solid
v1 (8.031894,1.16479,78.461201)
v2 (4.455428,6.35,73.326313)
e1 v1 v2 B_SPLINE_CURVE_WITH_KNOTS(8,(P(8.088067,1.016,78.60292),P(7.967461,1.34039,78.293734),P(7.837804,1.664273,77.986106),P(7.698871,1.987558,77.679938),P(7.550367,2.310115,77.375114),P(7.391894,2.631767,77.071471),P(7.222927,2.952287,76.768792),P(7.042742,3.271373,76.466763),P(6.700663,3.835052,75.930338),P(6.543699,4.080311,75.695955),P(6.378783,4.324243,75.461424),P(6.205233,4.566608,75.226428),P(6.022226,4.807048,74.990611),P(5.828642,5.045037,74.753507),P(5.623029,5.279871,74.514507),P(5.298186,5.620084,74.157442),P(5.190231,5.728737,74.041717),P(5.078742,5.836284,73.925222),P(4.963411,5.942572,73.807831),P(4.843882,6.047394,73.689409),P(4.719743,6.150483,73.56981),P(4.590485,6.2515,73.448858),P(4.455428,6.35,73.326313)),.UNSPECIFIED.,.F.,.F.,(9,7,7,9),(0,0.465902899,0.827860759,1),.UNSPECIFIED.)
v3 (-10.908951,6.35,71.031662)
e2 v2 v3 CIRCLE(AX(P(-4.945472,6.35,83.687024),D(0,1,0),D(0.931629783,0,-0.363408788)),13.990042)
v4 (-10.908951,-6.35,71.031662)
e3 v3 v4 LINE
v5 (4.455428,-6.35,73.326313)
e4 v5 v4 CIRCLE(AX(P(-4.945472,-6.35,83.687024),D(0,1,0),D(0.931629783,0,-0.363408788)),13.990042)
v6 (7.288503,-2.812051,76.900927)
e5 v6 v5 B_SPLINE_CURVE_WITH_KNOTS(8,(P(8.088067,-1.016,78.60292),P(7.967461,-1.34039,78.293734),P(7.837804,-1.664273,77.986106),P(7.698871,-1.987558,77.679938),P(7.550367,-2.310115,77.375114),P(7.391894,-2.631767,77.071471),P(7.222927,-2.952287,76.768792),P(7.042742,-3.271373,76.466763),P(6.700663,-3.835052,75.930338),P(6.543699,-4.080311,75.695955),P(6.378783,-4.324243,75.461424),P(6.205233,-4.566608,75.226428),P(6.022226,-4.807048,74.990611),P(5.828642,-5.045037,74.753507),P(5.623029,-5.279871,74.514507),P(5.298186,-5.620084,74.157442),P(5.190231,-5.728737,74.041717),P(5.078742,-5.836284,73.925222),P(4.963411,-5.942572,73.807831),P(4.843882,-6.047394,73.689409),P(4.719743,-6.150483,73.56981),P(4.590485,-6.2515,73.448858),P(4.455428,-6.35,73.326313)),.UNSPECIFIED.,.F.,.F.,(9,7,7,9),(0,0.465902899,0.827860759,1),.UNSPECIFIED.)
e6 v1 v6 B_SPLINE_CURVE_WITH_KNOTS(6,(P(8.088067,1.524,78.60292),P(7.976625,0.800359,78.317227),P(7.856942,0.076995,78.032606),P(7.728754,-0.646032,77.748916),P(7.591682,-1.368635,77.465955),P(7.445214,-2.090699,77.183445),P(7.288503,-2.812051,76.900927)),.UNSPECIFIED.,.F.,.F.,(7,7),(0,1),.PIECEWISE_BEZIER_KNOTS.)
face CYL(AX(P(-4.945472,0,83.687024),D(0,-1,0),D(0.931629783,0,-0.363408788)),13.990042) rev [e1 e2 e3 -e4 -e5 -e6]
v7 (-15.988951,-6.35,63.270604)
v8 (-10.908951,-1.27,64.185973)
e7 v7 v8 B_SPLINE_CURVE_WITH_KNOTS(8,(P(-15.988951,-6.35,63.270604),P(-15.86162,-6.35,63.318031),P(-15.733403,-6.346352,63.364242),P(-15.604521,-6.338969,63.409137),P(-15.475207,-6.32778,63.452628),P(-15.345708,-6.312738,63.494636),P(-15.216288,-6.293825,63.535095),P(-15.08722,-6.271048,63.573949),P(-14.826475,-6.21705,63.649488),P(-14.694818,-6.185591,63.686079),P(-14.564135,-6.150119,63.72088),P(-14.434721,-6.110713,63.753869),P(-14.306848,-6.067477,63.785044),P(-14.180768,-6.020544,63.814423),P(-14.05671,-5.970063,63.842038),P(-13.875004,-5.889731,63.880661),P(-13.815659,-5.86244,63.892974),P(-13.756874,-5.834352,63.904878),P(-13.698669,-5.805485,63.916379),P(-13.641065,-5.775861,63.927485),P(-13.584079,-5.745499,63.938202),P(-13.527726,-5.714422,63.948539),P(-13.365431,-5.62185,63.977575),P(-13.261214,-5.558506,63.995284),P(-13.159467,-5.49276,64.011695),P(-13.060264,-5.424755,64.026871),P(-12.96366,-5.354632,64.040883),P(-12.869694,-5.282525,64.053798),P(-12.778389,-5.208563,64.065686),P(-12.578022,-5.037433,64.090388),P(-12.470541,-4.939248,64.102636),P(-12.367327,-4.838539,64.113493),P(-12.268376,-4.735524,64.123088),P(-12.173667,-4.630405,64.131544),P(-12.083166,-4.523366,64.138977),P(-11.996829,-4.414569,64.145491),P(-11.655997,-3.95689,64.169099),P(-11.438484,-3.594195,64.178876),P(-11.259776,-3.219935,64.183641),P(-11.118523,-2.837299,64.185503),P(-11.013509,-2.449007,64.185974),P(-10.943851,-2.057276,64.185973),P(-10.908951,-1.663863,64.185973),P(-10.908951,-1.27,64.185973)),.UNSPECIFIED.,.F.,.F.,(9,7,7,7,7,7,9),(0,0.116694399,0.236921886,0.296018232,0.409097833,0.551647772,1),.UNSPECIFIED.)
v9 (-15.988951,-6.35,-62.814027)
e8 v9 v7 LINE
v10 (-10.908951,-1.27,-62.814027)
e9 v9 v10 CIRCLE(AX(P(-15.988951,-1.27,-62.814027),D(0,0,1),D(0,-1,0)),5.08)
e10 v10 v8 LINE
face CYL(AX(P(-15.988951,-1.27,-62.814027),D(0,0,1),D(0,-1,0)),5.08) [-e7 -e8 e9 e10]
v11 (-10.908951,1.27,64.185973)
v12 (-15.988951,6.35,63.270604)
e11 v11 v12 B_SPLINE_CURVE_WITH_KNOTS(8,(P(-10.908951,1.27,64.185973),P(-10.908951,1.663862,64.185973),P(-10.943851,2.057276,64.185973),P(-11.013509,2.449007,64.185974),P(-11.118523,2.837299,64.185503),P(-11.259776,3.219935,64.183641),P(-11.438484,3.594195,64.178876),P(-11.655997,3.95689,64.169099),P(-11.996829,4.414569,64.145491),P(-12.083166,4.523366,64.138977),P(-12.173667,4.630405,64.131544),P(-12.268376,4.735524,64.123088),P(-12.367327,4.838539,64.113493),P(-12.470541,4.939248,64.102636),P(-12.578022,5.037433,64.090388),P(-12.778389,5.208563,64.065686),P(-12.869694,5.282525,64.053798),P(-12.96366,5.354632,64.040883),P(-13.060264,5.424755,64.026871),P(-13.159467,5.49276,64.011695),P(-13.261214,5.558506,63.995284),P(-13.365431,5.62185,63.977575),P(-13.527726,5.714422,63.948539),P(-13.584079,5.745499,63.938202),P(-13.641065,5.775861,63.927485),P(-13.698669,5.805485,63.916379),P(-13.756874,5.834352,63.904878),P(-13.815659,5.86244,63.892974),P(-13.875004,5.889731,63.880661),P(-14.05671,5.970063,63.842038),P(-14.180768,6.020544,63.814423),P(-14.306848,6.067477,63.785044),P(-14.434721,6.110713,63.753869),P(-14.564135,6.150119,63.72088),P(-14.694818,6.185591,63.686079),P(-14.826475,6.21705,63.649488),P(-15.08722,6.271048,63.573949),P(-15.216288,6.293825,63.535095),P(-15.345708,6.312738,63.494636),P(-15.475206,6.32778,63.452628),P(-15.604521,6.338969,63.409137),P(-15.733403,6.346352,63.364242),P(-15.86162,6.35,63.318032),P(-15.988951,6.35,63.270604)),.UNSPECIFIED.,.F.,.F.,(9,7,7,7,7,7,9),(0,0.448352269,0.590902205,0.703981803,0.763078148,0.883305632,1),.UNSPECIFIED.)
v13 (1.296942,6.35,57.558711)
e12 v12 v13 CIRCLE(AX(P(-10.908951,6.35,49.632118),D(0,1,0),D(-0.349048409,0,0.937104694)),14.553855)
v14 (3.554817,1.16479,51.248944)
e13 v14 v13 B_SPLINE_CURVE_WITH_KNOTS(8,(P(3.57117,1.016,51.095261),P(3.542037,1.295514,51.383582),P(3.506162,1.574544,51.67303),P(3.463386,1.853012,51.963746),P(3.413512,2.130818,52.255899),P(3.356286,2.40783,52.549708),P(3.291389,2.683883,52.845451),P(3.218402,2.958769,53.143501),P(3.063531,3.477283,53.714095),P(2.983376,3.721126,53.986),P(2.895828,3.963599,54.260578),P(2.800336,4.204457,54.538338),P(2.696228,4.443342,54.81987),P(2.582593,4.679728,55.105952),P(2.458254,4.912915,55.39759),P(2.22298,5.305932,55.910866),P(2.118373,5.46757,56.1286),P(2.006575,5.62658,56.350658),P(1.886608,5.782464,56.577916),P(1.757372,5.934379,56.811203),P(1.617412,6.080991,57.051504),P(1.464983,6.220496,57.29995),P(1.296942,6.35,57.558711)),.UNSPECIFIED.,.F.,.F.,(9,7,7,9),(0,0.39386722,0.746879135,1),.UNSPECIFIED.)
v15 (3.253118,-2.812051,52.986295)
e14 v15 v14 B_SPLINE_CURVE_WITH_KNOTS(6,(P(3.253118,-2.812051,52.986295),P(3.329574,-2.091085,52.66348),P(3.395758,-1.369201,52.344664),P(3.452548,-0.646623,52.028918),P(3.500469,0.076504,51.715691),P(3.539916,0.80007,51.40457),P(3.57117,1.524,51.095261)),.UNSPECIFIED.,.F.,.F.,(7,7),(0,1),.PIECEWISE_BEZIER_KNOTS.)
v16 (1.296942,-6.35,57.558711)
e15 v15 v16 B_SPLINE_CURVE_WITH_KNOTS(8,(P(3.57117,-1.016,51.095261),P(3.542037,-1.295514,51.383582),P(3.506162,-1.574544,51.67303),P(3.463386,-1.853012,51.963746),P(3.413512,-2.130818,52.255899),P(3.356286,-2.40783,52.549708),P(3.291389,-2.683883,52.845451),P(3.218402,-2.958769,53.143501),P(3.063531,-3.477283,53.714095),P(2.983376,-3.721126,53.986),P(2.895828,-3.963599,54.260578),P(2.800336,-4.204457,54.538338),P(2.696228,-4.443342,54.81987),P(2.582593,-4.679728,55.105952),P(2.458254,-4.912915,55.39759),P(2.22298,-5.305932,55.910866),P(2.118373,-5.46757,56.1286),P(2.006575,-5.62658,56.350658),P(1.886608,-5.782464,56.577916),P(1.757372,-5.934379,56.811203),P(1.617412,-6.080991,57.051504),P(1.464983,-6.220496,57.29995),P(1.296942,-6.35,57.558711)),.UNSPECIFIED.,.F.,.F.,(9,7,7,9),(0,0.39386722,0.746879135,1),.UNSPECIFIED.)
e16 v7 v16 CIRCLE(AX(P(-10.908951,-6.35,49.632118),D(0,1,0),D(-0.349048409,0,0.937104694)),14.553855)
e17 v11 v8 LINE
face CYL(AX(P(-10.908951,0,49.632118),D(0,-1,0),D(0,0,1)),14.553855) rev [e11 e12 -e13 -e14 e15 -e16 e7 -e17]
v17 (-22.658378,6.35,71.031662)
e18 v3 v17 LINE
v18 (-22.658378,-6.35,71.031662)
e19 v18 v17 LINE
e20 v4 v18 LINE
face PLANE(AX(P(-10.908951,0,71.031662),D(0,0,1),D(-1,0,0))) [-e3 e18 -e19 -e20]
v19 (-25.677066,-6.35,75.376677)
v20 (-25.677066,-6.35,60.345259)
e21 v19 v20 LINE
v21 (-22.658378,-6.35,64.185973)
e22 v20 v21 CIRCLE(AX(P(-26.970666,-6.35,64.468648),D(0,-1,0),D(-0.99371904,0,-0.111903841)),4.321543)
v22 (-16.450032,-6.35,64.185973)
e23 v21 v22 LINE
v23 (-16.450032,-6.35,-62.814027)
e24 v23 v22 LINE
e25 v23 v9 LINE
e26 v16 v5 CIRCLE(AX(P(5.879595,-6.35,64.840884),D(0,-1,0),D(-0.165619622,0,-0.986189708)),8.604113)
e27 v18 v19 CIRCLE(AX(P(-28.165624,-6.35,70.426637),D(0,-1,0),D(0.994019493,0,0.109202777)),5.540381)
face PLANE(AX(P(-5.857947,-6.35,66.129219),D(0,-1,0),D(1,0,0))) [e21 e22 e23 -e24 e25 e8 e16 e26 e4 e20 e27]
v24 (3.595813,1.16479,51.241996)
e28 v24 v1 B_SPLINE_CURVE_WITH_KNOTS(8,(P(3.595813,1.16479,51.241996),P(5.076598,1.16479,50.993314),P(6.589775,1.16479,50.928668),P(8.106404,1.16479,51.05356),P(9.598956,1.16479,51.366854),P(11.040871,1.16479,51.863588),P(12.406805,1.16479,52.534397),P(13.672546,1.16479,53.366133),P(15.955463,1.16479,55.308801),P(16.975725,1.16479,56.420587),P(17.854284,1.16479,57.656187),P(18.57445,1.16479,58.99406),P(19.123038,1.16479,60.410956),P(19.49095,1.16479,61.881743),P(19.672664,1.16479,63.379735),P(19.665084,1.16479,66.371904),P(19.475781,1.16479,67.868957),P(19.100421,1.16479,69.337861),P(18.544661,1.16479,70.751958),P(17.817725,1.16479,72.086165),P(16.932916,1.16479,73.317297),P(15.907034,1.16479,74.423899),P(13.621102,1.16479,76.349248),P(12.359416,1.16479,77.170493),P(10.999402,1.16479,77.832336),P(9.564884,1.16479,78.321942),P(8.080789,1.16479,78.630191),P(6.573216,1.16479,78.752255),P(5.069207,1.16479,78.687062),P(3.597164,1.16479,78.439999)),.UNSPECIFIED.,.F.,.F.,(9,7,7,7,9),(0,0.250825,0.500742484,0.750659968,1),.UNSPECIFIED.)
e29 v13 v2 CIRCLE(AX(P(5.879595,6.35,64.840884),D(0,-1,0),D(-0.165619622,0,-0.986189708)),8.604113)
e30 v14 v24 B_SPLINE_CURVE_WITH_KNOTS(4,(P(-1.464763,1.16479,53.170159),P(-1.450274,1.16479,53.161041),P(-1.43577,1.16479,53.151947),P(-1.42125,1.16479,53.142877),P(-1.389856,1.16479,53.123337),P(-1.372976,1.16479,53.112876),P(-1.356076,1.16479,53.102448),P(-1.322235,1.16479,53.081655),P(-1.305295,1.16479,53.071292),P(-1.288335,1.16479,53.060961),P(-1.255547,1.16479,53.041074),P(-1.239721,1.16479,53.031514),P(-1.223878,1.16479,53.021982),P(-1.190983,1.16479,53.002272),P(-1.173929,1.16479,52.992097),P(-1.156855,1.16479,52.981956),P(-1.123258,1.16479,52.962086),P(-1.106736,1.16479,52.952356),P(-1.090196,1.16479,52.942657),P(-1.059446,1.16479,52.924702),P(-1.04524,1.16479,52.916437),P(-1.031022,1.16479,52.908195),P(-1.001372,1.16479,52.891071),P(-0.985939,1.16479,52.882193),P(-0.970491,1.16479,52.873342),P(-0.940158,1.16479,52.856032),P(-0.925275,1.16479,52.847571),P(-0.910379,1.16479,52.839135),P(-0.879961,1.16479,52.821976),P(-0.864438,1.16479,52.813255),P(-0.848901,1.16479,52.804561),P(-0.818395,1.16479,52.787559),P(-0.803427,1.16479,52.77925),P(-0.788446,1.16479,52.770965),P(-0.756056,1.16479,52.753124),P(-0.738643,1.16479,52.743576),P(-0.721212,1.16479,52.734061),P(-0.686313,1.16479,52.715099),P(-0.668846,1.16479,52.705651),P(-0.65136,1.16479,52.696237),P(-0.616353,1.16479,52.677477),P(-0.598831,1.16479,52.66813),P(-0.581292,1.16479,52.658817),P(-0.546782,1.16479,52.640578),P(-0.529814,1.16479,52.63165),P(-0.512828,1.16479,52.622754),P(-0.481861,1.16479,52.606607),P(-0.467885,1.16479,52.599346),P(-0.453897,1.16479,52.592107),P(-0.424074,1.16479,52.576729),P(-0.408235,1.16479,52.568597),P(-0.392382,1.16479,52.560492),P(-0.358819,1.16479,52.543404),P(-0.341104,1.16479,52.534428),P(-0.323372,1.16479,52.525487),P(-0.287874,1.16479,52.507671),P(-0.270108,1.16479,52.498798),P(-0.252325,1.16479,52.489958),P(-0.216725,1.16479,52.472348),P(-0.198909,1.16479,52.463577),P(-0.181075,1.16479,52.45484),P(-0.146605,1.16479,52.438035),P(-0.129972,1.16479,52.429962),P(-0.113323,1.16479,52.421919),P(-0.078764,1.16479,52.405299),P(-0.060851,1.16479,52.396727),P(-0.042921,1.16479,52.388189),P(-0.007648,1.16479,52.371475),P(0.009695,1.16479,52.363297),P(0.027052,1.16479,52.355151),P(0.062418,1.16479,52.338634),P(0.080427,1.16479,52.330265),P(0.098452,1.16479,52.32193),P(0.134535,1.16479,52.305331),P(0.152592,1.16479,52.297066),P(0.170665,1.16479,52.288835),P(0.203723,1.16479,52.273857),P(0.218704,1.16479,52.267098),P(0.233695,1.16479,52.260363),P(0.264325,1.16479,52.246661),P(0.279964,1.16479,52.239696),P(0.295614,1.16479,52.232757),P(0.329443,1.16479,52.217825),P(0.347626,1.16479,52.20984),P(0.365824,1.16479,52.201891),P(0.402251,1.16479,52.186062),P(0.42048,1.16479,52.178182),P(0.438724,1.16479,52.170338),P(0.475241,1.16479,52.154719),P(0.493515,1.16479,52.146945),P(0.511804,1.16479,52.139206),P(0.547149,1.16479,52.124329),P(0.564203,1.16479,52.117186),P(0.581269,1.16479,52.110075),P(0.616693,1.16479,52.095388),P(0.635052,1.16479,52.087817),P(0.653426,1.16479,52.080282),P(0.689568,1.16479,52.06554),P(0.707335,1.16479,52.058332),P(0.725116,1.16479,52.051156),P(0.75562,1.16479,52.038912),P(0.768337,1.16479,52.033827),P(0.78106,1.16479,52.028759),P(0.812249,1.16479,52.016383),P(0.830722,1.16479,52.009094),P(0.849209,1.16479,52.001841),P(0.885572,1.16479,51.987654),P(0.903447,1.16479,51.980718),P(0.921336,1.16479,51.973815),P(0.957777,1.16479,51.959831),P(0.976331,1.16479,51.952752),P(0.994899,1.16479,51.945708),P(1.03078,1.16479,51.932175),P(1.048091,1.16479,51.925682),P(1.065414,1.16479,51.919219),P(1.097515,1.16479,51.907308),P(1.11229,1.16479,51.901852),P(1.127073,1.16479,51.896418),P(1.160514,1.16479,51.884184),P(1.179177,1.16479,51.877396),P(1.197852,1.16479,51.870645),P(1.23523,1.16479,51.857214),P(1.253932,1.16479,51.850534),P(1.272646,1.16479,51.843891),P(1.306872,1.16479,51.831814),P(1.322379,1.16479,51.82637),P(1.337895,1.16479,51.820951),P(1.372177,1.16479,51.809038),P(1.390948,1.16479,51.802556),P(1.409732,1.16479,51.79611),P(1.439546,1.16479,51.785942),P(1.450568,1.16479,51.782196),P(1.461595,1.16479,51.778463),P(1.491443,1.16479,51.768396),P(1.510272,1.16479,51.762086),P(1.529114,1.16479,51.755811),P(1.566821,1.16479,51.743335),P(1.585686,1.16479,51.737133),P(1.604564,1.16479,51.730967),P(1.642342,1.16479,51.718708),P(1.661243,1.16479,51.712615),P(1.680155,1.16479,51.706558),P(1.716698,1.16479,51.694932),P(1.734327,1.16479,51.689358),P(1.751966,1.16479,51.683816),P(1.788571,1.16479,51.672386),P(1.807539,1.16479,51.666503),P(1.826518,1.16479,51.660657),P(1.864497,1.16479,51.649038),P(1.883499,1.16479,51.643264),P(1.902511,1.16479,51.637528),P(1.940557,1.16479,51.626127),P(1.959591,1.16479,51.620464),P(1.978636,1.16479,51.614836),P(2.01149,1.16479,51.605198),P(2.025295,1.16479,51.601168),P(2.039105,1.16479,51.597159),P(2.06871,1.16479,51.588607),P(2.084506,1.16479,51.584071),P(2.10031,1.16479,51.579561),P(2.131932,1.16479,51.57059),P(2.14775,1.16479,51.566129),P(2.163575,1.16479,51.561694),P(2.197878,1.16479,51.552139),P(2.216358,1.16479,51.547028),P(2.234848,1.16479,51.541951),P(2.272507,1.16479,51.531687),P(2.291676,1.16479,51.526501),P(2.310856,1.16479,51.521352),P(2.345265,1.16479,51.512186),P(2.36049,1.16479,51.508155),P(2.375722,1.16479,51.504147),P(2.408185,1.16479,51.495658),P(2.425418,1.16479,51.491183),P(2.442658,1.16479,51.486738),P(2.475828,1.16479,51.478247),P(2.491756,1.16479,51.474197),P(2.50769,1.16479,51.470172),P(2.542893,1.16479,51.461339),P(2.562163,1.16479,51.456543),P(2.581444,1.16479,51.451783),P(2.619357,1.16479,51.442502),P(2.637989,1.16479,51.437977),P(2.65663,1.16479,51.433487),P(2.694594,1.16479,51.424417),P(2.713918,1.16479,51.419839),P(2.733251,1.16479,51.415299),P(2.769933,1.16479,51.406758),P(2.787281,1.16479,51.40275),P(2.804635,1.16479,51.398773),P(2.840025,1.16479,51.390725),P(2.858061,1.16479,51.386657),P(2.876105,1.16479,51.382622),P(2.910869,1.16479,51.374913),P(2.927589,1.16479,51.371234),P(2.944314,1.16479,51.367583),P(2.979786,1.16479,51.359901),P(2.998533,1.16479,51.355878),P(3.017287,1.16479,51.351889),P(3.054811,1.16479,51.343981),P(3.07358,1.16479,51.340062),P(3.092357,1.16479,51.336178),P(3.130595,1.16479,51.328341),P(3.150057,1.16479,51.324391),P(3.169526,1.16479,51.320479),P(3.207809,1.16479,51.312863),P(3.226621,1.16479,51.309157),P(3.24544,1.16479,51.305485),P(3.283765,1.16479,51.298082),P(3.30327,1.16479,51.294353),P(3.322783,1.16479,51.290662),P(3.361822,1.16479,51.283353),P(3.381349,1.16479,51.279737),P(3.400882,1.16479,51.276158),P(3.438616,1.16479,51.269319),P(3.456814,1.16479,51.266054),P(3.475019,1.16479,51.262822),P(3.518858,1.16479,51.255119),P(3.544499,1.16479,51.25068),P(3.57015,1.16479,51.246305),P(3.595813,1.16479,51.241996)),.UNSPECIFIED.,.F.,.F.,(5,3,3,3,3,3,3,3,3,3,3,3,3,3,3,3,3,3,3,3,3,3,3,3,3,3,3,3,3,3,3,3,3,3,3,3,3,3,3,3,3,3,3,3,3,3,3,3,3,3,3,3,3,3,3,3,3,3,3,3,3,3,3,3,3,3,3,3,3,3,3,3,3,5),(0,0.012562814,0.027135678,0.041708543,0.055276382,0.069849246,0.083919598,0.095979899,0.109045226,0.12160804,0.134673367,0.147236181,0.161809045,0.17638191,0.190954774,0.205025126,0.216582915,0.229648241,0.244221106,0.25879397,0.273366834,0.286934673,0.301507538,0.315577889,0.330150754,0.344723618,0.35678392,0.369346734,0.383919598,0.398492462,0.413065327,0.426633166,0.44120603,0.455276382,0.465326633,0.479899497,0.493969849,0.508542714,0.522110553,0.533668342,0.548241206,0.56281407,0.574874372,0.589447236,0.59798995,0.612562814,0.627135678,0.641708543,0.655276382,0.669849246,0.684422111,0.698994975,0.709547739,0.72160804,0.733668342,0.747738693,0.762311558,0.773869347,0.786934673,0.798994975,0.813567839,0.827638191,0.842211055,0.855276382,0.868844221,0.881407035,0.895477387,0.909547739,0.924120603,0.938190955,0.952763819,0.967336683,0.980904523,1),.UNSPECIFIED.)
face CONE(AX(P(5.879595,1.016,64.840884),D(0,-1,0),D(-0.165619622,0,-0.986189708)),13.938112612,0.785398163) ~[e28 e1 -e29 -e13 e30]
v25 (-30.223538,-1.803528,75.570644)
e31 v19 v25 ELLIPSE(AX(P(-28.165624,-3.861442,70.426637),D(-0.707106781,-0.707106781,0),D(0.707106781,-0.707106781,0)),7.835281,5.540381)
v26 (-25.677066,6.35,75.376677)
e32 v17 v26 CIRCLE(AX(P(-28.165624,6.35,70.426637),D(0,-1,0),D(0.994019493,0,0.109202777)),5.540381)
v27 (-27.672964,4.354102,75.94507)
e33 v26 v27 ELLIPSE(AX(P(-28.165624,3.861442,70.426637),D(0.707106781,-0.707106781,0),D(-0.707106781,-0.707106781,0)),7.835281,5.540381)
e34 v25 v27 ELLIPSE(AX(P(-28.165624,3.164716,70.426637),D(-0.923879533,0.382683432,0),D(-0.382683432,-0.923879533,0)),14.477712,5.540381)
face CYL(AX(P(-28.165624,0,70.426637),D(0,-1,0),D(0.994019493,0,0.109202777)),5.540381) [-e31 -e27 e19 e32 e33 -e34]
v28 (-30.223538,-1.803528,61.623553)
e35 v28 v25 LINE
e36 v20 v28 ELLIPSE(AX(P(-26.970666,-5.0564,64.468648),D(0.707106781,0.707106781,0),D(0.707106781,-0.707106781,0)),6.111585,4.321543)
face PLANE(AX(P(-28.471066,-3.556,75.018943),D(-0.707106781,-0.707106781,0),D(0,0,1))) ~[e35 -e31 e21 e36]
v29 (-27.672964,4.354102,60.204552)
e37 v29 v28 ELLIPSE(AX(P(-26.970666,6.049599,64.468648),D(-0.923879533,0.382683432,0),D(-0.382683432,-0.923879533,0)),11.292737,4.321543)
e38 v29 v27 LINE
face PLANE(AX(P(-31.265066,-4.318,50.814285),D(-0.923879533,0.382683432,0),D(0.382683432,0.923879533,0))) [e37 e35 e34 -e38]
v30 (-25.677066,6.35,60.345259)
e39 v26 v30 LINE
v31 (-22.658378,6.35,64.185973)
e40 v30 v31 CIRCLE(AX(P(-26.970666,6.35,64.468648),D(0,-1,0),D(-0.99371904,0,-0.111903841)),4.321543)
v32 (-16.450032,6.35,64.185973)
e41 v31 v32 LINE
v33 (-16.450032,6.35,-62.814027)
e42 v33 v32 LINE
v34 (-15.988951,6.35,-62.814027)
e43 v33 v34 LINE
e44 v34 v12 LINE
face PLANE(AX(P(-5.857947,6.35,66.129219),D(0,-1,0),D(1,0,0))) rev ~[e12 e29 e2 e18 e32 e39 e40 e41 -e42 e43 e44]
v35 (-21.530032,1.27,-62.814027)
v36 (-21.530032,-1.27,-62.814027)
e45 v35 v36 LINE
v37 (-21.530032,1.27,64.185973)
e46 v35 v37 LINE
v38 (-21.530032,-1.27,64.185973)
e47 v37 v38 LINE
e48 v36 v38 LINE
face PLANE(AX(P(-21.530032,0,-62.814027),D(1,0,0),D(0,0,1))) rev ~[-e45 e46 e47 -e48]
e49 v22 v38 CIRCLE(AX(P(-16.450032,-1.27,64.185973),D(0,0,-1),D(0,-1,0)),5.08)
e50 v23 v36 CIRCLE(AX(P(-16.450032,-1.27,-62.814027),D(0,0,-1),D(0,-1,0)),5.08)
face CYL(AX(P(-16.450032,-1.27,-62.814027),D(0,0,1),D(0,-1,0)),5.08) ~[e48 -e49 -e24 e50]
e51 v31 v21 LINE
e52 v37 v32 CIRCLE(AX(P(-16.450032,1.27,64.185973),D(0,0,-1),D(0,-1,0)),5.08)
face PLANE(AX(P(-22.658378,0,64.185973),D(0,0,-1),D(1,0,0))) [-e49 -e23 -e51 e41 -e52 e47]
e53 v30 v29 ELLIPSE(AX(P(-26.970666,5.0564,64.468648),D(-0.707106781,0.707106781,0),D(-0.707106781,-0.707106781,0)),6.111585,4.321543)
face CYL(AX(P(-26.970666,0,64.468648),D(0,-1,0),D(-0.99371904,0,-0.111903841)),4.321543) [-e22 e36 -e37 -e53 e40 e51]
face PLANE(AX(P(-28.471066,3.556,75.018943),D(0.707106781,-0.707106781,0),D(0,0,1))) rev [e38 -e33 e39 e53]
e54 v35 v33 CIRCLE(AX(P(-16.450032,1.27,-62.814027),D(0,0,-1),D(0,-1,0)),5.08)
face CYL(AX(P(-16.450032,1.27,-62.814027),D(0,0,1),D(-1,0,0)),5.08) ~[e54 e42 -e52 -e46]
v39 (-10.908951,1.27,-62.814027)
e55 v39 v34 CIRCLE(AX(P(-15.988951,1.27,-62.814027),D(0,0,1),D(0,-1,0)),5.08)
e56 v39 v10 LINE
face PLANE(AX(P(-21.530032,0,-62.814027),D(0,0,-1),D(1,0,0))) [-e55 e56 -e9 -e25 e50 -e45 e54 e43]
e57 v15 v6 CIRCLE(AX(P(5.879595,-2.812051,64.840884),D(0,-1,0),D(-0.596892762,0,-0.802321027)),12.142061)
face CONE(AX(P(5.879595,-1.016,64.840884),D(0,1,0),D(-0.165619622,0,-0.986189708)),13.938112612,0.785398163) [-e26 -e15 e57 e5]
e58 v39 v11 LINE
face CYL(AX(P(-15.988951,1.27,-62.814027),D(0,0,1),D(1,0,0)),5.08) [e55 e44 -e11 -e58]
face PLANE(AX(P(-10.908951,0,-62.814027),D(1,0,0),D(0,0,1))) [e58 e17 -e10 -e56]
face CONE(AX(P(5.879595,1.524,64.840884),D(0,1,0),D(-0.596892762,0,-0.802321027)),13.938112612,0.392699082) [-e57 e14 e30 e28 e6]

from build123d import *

# Parameters (mm, degrees)
F0_W        = 10.6210811783
F0_H        = 127
F1_DEPTH    = 6.35
F2_DEPTH    = 6.35
F3_SIZE     = 5.334
F4_T2_ANGLE = 234.6452810907
F5_SIZE     = 5.588
F6_T1_DEPTH = 37.3754237446
F7_R        = 5.08
F8_R        = 5.08


# Not quite as in the source:
# - a fillet or chamfer that OpenCascade refuses, or shapes differently, is made with other operations: its cross-section is extruded or revolved along the edge and cut away or added
# - a feature names something its author has since deleted; it is built from what else it names


with BuildPart() as f1:
    # F0 (on Front) → F1 (new body)
    with BuildSketch(Plane.XZ):
        with BuildLine():
            ThreePointArc((-31.2650664442, 63.9850506011), (-26.8698078998, 60.1482815757), (-22.6583778858, 64.185972929))
            Line((-22.6583778858, 64.185972929), (-21.5300321579, 64.185972929))
            Line((-21.5300321579, 64.185972929), (-10.9089509796, 64.185972929))
            ThreePointArc((-10.9089509796, 64.185972929), (-1.1488196144, 60.4281603773), (3.5711703362, 51.0952608115))
            ThreePointArc((3.5711703362, 51.0952608115), (19.6335156732, 62.5824206191), (8.0880673261, 78.602920007))
            ThreePointArc((8.0880673261, 78.602920007), (0.2340476898, 70.6911078158), (-10.9089509796, 71.0316621421))
            Line((-10.9089509796, 71.0316621421), (-22.6583778858, 71.0316621421))
            ThreePointArc((-22.6583778858, 71.0316621421), (-25.8366796537, 75.4537471146), (-31.2650664442, 75.0189431538))
            Line((-31.2650664442, 75.0189431538), (-31.2650664442, 63.9850506011))
        make_face()
        with Locations((-16.2194915688, 0.685972929)):
            Rectangle(F0_W, F0_H)
    extrude(amount=F1_DEPTH)

    # F0 (on Front) → F2 (join)
    with BuildSketch(Plane.XZ):
        with BuildLine():
            ThreePointArc((-31.2650664442, 63.9850506011), (-26.8698078998, 60.1482815757), (-22.6583778858, 64.185972929))
            Line((-22.6583778858, 64.185972929), (-21.5300321579, 64.185972929))
            Line((-21.5300321579, 64.185972929), (-10.9089509796, 64.185972929))
            ThreePointArc((-10.9089509796, 64.185972929), (-1.1488196144, 60.4281603773), (3.5711703362, 51.0952608115))
            ThreePointArc((3.5711703362, 51.0952608115), (19.6335156732, 62.5824206191), (8.0880673261, 78.602920007))
            ThreePointArc((8.0880673261, 78.602920007), (0.2340476898, 70.6911078158), (-10.9089509796, 71.0316621421))
            Line((-10.9089509796, 71.0316621421), (-22.6583778858, 71.0316621421))
            ThreePointArc((-22.6583778858, 71.0316621421), (-25.8366796537, 75.4537471146), (-31.2650664442, 75.0189431538))
            Line((-31.2650664442, 75.0189431538), (-31.2650664442, 63.9850506011))
        make_face()
        with Locations((-16.2194915688, 0.685972929)):
            Rectangle(F0_W, F0_H)
    extrude(amount=-F2_DEPTH)

    # F3
    f3_edges = [f1.edges().sort_by_distance(p)[0] for p in [
        (19.633516, -6.35, 62.582421),
        (19.633516, 6.35, 62.582421),
    ]]
    chamfer(f3_edges, length=F3_SIZE)

    # F4: chamfer of 2.54 on 1 edges, made by hand

    # F4_s1 → F4_t2 (revolve, cut)
    with BuildSketch(Plane(origin=(-27.2674669531, 0, 20.2858371039), x_dir=(0, 1, 0), z_dir=(-0.8023210272, 0, 0.596892762))):
        Polygon((1.524, -41.5945799258), (-2.8120512242, -43.39063115), (-1.016, -41.5945799258), align=None)
    revolve(axis=Axis((5.8795952776, -1.016, 64.8408840236), (0, -1, 0)), revolution_arc=F4_T2_ANGLE, mode=Mode.SUBTRACT)

    # F5
    f5_edges = [f1.edges().sort_by_distance(p)[0] for p in [
        (-31.265066, 6.35, 69.501997),
        (-31.265066, -6.35, 69.501997),
    ]]
    chamfer(f5_edges, length=F5_SIZE)

    # F6: chamfer of 5.08 on 1 edges, made by hand

    # F6_s2 → F6_t1 (cut)
    with BuildSketch(Plane.XY.offset(50.8142850052)):
        Polygon((-31.2650664442, -4.318), (-27.6729639958, 4.3541024484), (-31.2650664442, 0.762), align=None)
    extrude(amount=F6_T1_DEPTH, mode=Mode.SUBTRACT)

    # F7
    f7_edges = [f1.edges().sort_by_distance(p)[0] for p in [
        (-10.908951, -6.35, 0.685973),
        (-10.908951, 6.35, 0.685973),
    ]]
    fillet(f7_edges, radius=F7_R)

    # F8
    f8_edges = [f1.edges().sort_by_distance(p)[0] for p in [
        (-21.530032, 6.35, 0.685973),
        (-21.530032, -6.35, 0.685973),
    ]]
    fillet(f8_edges, radius=F8_R)


solid = f1.part
